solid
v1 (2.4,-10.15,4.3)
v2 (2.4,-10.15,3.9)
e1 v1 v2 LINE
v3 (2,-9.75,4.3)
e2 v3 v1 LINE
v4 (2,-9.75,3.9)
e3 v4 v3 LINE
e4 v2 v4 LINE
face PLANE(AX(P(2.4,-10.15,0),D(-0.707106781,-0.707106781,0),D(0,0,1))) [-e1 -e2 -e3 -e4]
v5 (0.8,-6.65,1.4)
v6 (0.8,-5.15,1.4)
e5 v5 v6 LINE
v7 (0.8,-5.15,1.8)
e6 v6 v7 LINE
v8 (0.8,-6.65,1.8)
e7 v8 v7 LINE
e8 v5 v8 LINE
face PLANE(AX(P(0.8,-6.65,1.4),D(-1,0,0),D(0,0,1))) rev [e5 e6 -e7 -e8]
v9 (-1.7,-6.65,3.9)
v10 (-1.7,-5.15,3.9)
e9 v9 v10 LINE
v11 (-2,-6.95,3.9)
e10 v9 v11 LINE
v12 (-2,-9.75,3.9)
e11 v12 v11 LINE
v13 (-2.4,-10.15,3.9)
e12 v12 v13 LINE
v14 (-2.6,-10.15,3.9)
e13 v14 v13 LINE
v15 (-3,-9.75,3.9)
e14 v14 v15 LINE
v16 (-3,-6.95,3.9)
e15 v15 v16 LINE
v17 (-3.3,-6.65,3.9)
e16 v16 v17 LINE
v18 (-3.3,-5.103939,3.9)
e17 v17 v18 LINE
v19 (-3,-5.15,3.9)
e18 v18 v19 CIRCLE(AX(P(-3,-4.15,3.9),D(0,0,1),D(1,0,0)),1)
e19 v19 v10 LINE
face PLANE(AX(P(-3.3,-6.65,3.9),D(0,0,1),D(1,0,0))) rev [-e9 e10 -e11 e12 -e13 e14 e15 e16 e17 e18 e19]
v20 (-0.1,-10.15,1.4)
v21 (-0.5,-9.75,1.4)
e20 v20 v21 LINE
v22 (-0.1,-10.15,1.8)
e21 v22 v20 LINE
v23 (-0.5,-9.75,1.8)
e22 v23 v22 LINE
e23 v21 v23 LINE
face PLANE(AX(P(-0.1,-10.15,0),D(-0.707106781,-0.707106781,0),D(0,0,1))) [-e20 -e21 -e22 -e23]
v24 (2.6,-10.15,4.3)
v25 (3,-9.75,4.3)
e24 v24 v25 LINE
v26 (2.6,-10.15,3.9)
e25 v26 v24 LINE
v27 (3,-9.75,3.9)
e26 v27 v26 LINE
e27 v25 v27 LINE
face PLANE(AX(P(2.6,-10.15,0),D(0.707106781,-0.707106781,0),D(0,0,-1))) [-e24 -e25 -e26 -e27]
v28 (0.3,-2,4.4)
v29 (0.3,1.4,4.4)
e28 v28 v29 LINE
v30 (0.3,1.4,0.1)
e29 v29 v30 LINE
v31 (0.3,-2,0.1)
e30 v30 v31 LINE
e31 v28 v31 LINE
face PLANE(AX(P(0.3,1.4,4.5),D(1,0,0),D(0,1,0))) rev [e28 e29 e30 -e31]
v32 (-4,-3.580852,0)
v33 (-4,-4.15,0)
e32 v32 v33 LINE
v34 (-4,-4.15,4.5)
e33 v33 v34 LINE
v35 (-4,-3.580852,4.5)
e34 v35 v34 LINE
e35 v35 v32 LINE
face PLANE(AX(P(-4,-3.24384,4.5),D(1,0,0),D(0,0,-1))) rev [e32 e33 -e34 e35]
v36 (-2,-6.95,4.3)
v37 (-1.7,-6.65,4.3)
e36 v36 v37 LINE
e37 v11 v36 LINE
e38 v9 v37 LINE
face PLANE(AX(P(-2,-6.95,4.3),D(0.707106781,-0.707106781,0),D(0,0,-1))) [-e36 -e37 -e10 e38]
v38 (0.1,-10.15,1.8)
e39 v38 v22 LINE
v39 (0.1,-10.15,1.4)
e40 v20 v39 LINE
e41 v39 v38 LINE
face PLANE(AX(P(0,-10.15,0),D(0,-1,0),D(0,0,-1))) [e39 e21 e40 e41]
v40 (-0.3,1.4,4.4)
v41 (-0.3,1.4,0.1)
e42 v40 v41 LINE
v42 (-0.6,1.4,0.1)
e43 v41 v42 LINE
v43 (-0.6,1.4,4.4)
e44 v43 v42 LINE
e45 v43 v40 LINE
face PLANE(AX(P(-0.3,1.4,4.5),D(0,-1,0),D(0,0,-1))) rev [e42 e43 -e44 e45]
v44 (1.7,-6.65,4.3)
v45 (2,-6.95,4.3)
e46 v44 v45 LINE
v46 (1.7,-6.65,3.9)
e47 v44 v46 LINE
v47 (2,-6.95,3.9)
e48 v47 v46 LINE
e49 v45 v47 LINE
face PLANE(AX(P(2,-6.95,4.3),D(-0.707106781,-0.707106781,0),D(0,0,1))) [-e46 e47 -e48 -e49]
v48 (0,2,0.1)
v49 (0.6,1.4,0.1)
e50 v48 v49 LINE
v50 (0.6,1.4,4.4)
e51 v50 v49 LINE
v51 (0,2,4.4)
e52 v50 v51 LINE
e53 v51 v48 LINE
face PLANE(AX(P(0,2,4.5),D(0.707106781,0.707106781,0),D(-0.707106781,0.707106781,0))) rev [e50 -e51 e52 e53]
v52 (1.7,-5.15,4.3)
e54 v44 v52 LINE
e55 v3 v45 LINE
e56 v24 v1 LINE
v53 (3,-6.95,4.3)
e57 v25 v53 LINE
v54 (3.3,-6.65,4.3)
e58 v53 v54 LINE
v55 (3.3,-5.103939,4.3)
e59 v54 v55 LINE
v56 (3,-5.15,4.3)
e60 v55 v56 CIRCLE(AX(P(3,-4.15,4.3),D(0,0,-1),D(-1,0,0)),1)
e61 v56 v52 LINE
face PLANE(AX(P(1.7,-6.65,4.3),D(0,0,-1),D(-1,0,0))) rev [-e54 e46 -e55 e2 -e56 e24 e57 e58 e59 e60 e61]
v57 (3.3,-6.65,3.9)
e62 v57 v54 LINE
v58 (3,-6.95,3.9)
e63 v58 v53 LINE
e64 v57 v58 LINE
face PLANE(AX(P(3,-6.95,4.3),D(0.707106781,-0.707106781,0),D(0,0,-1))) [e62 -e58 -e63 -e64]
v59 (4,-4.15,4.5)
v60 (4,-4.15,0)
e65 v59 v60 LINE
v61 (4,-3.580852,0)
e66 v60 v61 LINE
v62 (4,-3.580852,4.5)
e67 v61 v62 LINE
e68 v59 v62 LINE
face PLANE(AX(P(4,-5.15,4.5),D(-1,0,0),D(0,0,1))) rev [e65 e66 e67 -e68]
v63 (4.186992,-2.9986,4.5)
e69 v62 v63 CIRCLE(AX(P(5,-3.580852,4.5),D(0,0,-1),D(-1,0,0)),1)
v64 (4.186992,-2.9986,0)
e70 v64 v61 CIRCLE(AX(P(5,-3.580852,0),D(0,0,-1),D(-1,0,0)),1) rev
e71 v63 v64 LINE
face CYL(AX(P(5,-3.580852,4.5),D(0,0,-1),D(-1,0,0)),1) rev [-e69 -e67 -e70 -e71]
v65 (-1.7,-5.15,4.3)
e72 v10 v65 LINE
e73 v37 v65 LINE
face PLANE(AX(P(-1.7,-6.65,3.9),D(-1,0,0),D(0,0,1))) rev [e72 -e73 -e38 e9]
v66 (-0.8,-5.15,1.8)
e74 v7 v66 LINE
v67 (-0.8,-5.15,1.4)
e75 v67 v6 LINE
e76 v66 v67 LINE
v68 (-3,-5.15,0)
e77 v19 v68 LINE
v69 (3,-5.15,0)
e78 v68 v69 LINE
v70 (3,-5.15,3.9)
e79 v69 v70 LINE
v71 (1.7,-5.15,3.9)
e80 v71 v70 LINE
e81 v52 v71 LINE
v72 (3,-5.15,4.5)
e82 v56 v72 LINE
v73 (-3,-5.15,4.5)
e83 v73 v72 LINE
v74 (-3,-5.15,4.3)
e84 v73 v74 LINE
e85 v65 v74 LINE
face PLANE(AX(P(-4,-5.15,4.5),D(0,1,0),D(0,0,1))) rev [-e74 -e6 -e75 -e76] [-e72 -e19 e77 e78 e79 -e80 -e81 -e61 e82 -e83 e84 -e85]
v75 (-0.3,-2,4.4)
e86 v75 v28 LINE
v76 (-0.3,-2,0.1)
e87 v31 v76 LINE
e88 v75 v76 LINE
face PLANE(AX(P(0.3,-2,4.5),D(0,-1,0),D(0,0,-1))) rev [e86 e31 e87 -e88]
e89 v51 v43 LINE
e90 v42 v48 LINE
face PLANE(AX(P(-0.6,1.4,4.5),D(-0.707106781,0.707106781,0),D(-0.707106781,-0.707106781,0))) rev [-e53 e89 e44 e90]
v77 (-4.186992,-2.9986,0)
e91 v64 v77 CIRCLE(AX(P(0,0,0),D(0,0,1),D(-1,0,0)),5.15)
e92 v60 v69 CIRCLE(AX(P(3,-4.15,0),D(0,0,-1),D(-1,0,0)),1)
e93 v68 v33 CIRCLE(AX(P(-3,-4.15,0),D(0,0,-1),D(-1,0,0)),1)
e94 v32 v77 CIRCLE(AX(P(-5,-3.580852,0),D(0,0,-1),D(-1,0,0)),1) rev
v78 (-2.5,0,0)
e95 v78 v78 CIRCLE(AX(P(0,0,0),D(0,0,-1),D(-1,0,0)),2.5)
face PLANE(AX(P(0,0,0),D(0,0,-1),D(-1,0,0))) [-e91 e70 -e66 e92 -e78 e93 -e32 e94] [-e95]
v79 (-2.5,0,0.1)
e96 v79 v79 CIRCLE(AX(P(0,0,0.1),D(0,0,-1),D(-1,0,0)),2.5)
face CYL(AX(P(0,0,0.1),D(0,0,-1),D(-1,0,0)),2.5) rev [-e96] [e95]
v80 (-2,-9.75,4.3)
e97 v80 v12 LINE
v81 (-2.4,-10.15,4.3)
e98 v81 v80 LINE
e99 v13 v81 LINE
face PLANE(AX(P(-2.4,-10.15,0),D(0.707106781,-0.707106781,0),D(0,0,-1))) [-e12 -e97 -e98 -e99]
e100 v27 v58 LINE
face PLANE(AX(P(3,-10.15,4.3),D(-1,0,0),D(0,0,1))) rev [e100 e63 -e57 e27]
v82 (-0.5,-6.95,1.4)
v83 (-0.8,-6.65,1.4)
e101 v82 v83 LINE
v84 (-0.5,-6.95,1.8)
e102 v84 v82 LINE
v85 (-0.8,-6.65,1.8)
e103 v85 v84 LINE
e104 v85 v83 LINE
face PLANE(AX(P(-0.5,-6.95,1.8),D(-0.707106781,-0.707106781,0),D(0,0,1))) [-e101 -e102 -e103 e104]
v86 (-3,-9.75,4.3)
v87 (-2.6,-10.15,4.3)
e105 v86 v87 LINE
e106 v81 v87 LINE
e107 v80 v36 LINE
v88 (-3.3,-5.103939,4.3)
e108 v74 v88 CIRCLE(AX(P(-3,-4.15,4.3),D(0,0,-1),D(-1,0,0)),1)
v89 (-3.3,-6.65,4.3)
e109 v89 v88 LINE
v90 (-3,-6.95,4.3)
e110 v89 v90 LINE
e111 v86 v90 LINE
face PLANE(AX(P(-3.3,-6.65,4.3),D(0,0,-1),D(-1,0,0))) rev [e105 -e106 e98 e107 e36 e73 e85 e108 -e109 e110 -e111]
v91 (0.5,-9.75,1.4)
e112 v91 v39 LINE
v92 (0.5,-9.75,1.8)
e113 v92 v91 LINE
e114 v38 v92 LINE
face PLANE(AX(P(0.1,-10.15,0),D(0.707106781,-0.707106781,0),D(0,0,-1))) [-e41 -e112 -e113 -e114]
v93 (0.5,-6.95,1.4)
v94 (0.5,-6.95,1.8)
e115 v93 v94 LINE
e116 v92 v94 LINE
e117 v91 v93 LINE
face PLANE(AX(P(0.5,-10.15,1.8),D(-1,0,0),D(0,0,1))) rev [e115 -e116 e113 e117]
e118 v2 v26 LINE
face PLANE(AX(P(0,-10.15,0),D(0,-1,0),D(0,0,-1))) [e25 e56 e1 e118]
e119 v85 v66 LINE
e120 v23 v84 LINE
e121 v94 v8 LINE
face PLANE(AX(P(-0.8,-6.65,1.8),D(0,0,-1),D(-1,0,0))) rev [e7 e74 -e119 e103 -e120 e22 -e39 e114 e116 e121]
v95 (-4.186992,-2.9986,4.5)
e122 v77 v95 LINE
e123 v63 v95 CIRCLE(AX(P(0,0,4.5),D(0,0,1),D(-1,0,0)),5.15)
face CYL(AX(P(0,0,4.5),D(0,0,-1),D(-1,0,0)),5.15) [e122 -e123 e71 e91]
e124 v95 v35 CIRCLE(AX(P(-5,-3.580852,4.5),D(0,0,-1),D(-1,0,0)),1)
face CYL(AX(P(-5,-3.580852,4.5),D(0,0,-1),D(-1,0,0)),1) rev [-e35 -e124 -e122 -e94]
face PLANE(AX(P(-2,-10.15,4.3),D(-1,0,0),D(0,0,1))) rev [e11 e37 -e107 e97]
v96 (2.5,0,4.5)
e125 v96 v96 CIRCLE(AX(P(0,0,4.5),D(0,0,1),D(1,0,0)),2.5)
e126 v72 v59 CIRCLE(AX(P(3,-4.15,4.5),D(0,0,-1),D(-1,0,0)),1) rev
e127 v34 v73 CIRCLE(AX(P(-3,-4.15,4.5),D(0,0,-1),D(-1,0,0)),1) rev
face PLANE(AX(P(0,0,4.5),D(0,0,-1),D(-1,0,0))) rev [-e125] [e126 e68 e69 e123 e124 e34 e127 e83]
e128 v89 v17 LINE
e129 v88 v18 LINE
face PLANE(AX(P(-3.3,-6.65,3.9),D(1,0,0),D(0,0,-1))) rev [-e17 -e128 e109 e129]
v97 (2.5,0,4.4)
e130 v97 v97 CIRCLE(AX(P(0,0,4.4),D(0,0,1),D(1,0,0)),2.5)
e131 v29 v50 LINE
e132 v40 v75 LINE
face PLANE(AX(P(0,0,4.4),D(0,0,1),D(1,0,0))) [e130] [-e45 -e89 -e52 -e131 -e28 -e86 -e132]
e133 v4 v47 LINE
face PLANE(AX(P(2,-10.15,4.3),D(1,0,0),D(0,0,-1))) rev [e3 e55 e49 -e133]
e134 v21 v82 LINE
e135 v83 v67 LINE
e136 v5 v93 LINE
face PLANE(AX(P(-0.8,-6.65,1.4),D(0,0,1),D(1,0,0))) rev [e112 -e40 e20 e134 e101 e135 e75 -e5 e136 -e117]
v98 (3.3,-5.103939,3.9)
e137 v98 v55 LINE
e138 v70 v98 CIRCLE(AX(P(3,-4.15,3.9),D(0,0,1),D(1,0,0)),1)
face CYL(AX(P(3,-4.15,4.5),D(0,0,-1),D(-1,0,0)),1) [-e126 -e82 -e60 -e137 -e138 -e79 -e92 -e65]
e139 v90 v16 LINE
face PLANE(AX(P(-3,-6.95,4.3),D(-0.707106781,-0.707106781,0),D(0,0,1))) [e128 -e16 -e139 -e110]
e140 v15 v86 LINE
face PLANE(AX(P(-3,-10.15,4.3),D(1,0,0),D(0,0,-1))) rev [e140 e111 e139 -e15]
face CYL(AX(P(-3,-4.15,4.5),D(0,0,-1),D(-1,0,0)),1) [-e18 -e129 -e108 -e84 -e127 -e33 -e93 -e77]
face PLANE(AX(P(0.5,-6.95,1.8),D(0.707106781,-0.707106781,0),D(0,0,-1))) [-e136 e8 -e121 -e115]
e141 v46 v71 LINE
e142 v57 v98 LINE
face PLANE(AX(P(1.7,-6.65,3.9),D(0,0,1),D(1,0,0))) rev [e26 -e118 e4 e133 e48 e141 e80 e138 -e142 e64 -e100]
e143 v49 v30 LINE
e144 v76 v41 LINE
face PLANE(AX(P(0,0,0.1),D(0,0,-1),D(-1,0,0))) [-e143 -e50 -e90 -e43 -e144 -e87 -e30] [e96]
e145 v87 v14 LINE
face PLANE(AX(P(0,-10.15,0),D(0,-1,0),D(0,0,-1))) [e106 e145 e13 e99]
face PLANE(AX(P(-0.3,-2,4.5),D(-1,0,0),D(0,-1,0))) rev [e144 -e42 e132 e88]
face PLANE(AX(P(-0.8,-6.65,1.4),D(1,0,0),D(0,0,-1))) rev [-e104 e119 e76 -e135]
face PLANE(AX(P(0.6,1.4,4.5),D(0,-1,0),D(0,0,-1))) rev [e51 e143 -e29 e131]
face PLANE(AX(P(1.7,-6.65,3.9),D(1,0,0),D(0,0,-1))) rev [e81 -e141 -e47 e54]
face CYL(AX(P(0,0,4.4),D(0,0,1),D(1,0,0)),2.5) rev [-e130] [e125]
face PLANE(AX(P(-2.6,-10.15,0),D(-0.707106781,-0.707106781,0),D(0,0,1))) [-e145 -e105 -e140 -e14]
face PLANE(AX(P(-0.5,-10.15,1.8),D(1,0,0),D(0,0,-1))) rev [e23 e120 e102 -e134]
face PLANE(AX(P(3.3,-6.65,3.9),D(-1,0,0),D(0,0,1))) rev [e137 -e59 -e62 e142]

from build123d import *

# Parameters (mm, degrees)
BOSS_EXTRU_1_DEPTH      = 4.5
ESQUISSE2_W             = 1.6
ESQUISSE2_H             = 0.4
BOSS_EXTRU_2_DEPTH      = 1.5
ESQUISSE3_W             = 1
ESQUISSE3_H             = 0.4
BOSS_EXTRU_3_DEPTH      = 3.5
CHANFREIN1_SIZE         = 0.3
CHANFREIN2_SIZE         = 0.4
ESQUISSE4_R             = 2.5
ENL_V_MAT_EXTRU_1_DEPTH = 0.1
ENL_V_START             = -0.1
ESQUISSE5_R             = 2.5
ENL_V_MAT_EXTRU_2_DEPTH = 0.1
ENL_V_MAT_EXTRU_3_DEPTH = 13.202663644
CONG_1_R                = 1


# Some blends are built 0.0001 mm under size
with BuildPart() as part:
    # Esquisse1 → Boss.-Extru.1 (new body)
    with BuildSketch(Plane.XY):
        with BuildLine():
            Line((-4, -3.243840317), (-4, -5.15))
            Line((-4, -5.15), (4, -5.15))
            Line((4, -5.15), (4, -3.243840317))
            ThreePointArc((4, -3.243840317), (0, 5.15), (-4, -3.243840317))
        make_face()
    extrude(amount=BOSS_EXTRU_1_DEPTH)

    # Esquisse2 → Boss.-Extru.2 (add)
    with BuildSketch(Plane.XZ.offset(5.15)):
        with Locations((-2.5, 4.1)):
            Rectangle(ESQUISSE2_W, ESQUISSE2_H)
        with Locations((2.5, 4.1)):
            Rectangle(ESQUISSE2_W, ESQUISSE2_H)
        with Locations((0, 1.6)):
            Rectangle(ESQUISSE2_W, ESQUISSE2_H)
    extrude(amount=BOSS_EXTRU_2_DEPTH)

    # Esquisse3 → Boss.-Extru.3 (add)
    with BuildSketch(Plane.XZ.offset(6.65)):
        with Locations((-2.5, 4.1)):
            Rectangle(ESQUISSE3_W, ESQUISSE3_H)
        with Locations((2.5, 4.1)):
            Rectangle(ESQUISSE3_W, ESQUISSE3_H)
        with Locations((0, 1.6)):
            Rectangle(ESQUISSE3_W, ESQUISSE3_H)
    extrude(amount=BOSS_EXTRU_3_DEPTH)

    # Chanfrein1
    chanfrein1_edges = [part.edges().sort_by_distance(p)[0] for p in [
        (3, -6.65, 4.1),
        (-2, -6.65, 4.1),
        (0.5, -6.65, 1.6),
        (-0.5, -6.65, 1.6),
        (2, -6.65, 4.1),
        (-3, -6.65, 4.1),
    ]]
    chamfer(chanfrein1_edges, length=CHANFREIN1_SIZE - 0.0001)  # a hair under: the kernel refuses the full size

    # Chanfrein2
    chanfrein2_edges = [part.edges().sort_by_distance(p)[0] for p in [
        (-3, -10.15, 4.1),
        (-2, -10.15, 4.1),
        (2, -10.15, 4.1),
        (3, -10.15, 4.1),
        (-0.5, -10.15, 1.6),
        (0.5, -10.15, 1.6),
    ]]
    chamfer(chanfrein2_edges, length=CHANFREIN2_SIZE)

    # Esquisse4 → Enlèv. mat.-Extru.1 (cut)
    with BuildSketch(Plane(origin=(0, 0, 0), x_dir=(-1, 0, 0), z_dir=(0, 0, -1))):
        Circle(ESQUISSE4_R)
    extrude(amount=-ENL_V_MAT_EXTRU_1_DEPTH, mode=Mode.SUBTRACT)

    # Esquisse5 → Enlèv. mat.-Extru.2 (cut)
    with BuildSketch(Plane.XY.offset(4.5).offset(ENL_V_START)):
        with Locations(Location((0, 0, 0), (0, 0, 180))):
            Circle(ESQUISSE5_R)
    extrude(amount=ENL_V_MAT_EXTRU_2_DEPTH, mode=Mode.SUBTRACT)

    # Esquisse6 → Enlèv. mat.-Extru.3 (cut, through all)
    with BuildSketch(Plane(origin=(0, 0, 0.1), x_dir=(-1, 0, 0), z_dir=(0, 0, -1))):
        Polygon((0, 2), (-0.6, 1.4), (-0.3, 1.4), (-0.3, -2), (0.3, -2), (0.3, 1.4), (0.6, 1.4), align=None)
    extrude(amount=-ENL_V_MAT_EXTRU_3_DEPTH, mode=Mode.SUBTRACT)

    # Congé1
    # the kernel refuses this fillet: 1 mm, written as the material it adds along each edge
    with BuildSketch(Plane(origin=(-4, -3.243840317, 0), x_dir=(0, -1, 0), z_dir=(0, 0, 1))) as cong_1_piece_1:
        with BuildLine():
            CenterArc((0.337011537, -1), CONG_1_R, 90, 35.609116242)
            ThreePointArc((-0.245240797, -0.18699187), (-0.12122038, -0.095332066), (0, 0))
            Line((0, 0), (0.337011537, 0))
        make_face()
    extrude(amount=4.5)
    with BuildSketch(Plane(origin=(4, -3.243840317, 0), x_dir=(0, -1, 0), z_dir=(0, 0, 1))) as cong_1_piece_2:
        with BuildLine():
            CenterArc((0.337011537, 1), CONG_1_R, 234.390883758, 35.609116242)
            ThreePointArc((-0.245240797, 0.18699187), (-0.12122038, 0.095332066), (0, 0))
            Line((0, 0), (0.337011537, 0))
        make_face()
    extrude(amount=4.5)
    # the kernel refuses this fillet: 1 mm, written as the material it takes off along each edge
    with BuildSketch(Plane(origin=(-4, -5.15, -2.5), x_dir=(1, 0, 0), z_dir=(0, 0, 1))) as cong_1_2_piece_1_section:
        with BuildLine():
            CenterArc((CONG_1_R, CONG_1_R), CONG_1_R, 180, 90)
            Line((0, CONG_1_R), (0, 0))
            Line((0, 0), (CONG_1_R, 0))
        make_face()
    cong_1_2_piece_1 = extrude(amount=9.5, mode=Mode.PRIVATE)
    cong_1_2_piece_1 = split(cong_1_2_piece_1, bisect_by=Plane(origin=(-3.3, -5.149735602, 0.7), z_dir=(1, 0, 0)), keep=Keep.TOP, mode=Mode.PRIVATE)
    cong_1_2_piece_1 = split(cong_1_2_piece_1, bisect_by=Plane(origin=(-3.182548732, -5.149735602, 3.9), z_dir=(0, 0, -1)), keep=Keep.TOP, mode=Mode.PRIVATE)
    add(cong_1_2_piece_1, mode=Mode.SUBTRACT)
    with BuildSketch(Plane(origin=(-4, -5.15, -2.5), x_dir=(1, 0, 0), z_dir=(0, 0, 1))) as cong_1_2_piece_2_section:
        with BuildLine():
            CenterArc((CONG_1_R, CONG_1_R), CONG_1_R, 180, 90)
            Line((0, CONG_1_R), (0, 0))
            Line((0, 0), (CONG_1_R, 0))
        make_face()
    cong_1_2_piece_2 = extrude(amount=9.5, mode=Mode.PRIVATE)
    cong_1_2_piece_2 = split(cong_1_2_piece_2, bisect_by=Plane(origin=(-3.3, -4.913833239, 0.7), z_dir=(-1, 0, 0)), keep=Keep.TOP, mode=Mode.PRIVATE)
    cong_1_2_piece_2 = split(cong_1_2_piece_2, bisect_by=Plane(origin=(-3.799145829, -4.913833239, 3.9), z_dir=(0, 0, -1)), keep=Keep.TOP, mode=Mode.PRIVATE)
    add(cong_1_2_piece_2, mode=Mode.SUBTRACT)
    with BuildSketch(Plane(origin=(-4, -5.15, -2.5), x_dir=(1, 0, 0), z_dir=(0, 0, 1))) as cong_1_2_piece_3_section:
        with BuildLine():
            CenterArc((CONG_1_R, CONG_1_R), CONG_1_R, 180, 90)
            Line((0, CONG_1_R), (0, 0))
            Line((0, 0), (CONG_1_R, 0))
        make_face()
    cong_1_2_piece_3 = extrude(amount=9.5, mode=Mode.PRIVATE)
    cong_1_2_piece_3 = split(cong_1_2_piece_3, bisect_by=Plane(origin=(-3.799145829, -4.913833239, 4.3), z_dir=(0, 0, -1)), keep=Keep.TOP, mode=Mode.PRIVATE)
    cong_1_2_piece_3 = split(cong_1_2_piece_3, bisect_by=Plane(origin=(-3.3, -4.913833239, 4.1), z_dir=(-1, 0, 0)), keep=Keep.TOP, mode=Mode.PRIVATE)
    cong_1_2_piece_3 = split(cong_1_2_piece_3, bisect_by=Plane(origin=(-3.799145829, -4.913833239, 3.9), z_dir=(0, 0, 1)), keep=Keep.TOP, mode=Mode.PRIVATE)
    add(cong_1_2_piece_3, mode=Mode.SUBTRACT)
    with BuildSketch(Plane(origin=(-4, -5.15, -2.5), x_dir=(1, 0, 0), z_dir=(0, 0, 1))) as cong_1_2_piece_4_section:
        with BuildLine():
            CenterArc((CONG_1_R, CONG_1_R), CONG_1_R, 180, 90)
            Line((0, CONG_1_R), (0, 0))
            Line((0, 0), (CONG_1_R, 0))
        make_face()
    cong_1_2_piece_4 = extrude(amount=9.5, mode=Mode.PRIVATE)
    cong_1_2_piece_4 = split(cong_1_2_piece_4, bisect_by=Plane(origin=(-3.182548732, -5.149735602, 4.3), z_dir=(0, 0, 1)), keep=Keep.TOP, mode=Mode.PRIVATE)
    cong_1_2_piece_4 = split(cong_1_2_piece_4, bisect_by=Plane(origin=(-3.3, -5.149735602, 5.65), z_dir=(1, 0, 0)), keep=Keep.TOP, mode=Mode.PRIVATE)
    add(cong_1_2_piece_4, mode=Mode.SUBTRACT)
    with BuildSketch(Plane(origin=(-4, -5.15, -2.5), x_dir=(1, 0, 0), z_dir=(0, 0, 1))) as cong_1_2_piece_5_section:
        with BuildLine():
            CenterArc((CONG_1_R, CONG_1_R), CONG_1_R, 180, 90)
            Line((0, CONG_1_R), (0, 0))
            Line((0, 0), (CONG_1_R, 0))
        make_face()
    cong_1_2_piece_5 = extrude(amount=9.5, mode=Mode.PRIVATE)
    cong_1_2_piece_5 = split(cong_1_2_piece_5, bisect_by=Plane(origin=(-3.799145829, -4.913833239, 4.3), z_dir=(0, 0, 1)), keep=Keep.TOP, mode=Mode.PRIVATE)
    cong_1_2_piece_5 = split(cong_1_2_piece_5, bisect_by=Plane(origin=(-3.3, -4.913833239, 5.65), z_dir=(-1, 0, 0)), keep=Keep.TOP, mode=Mode.PRIVATE)
    add(cong_1_2_piece_5, mode=Mode.SUBTRACT)
    with BuildSketch(Plane(origin=(4, -5.15, -2.5), x_dir=(-1, 0, 0), z_dir=(0, 0, 1))) as cong_1_2_piece_6_section:
        with BuildLine():
            CenterArc((CONG_1_R, -CONG_1_R), CONG_1_R, 90, 90)
            Line((0, -CONG_1_R), (0, 0))
            Line((0, 0), (CONG_1_R, 0))
        make_face()
    cong_1_2_piece_6 = extrude(amount=9.5, mode=Mode.PRIVATE)
    cong_1_2_piece_6 = split(cong_1_2_piece_6, bisect_by=Plane(origin=(3.3, -5.149735602, 0.7), z_dir=(-1, 0, 0)), keep=Keep.TOP, mode=Mode.PRIVATE)
    cong_1_2_piece_6 = split(cong_1_2_piece_6, bisect_by=Plane(origin=(3.182548732, -5.149735602, 3.9), z_dir=(0, 0, -1)), keep=Keep.TOP, mode=Mode.PRIVATE)
    add(cong_1_2_piece_6, mode=Mode.SUBTRACT)
    with BuildSketch(Plane(origin=(4, -5.15, -2.5), x_dir=(-1, 0, 0), z_dir=(0, 0, 1))) as cong_1_2_piece_7_section:
        with BuildLine():
            CenterArc((CONG_1_R, -CONG_1_R), CONG_1_R, 90, 90)
            Line((0, -CONG_1_R), (0, 0))
            Line((0, 0), (CONG_1_R, 0))
        make_face()
    cong_1_2_piece_7 = extrude(amount=9.5, mode=Mode.PRIVATE)
    cong_1_2_piece_7 = split(cong_1_2_piece_7, bisect_by=Plane(origin=(3.3, -4.913833239, 0.7), z_dir=(1, 0, 0)), keep=Keep.TOP, mode=Mode.PRIVATE)
    cong_1_2_piece_7 = split(cong_1_2_piece_7, bisect_by=Plane(origin=(3.799145829, -4.913833239, 3.9), z_dir=(0, 0, -1)), keep=Keep.TOP, mode=Mode.PRIVATE)
    add(cong_1_2_piece_7, mode=Mode.SUBTRACT)
    with BuildSketch(Plane(origin=(4, -5.15, -2.5), x_dir=(-1, 0, 0), z_dir=(0, 0, 1))) as cong_1_2_piece_8_section:
        with BuildLine():
            CenterArc((CONG_1_R, -CONG_1_R), CONG_1_R, 90, 90)
            Line((0, -CONG_1_R), (0, 0))
            Line((0, 0), (CONG_1_R, 0))
        make_face()
    cong_1_2_piece_8 = extrude(amount=9.5, mode=Mode.PRIVATE)
    cong_1_2_piece_8 = split(cong_1_2_piece_8, bisect_by=Plane(origin=(3.799145829, -4.913833239, 4.3), z_dir=(0, 0, -1)), keep=Keep.TOP, mode=Mode.PRIVATE)
    cong_1_2_piece_8 = split(cong_1_2_piece_8, bisect_by=Plane(origin=(3.3, -4.913833239, 4.1), z_dir=(1, 0, 0)), keep=Keep.TOP, mode=Mode.PRIVATE)
    cong_1_2_piece_8 = split(cong_1_2_piece_8, bisect_by=Plane(origin=(3.799145829, -4.913833239, 3.9), z_dir=(0, 0, 1)), keep=Keep.TOP, mode=Mode.PRIVATE)
    add(cong_1_2_piece_8, mode=Mode.SUBTRACT)
    with BuildSketch(Plane(origin=(4, -5.15, -2.5), x_dir=(-1, 0, 0), z_dir=(0, 0, 1))) as cong_1_2_piece_9_section:
        with BuildLine():
            CenterArc((CONG_1_R, -CONG_1_R), CONG_1_R, 90, 90)
            Line((0, -CONG_1_R), (0, 0))
            Line((0, 0), (CONG_1_R, 0))
        make_face()
    cong_1_2_piece_9 = extrude(amount=9.5, mode=Mode.PRIVATE)
    cong_1_2_piece_9 = split(cong_1_2_piece_9, bisect_by=Plane(origin=(3.182548732, -5.149735602, 4.3), z_dir=(0, 0, 1)), keep=Keep.TOP, mode=Mode.PRIVATE)
    cong_1_2_piece_9 = split(cong_1_2_piece_9, bisect_by=Plane(origin=(3.3, -5.149735602, 5.65), z_dir=(-1, 0, 0)), keep=Keep.TOP, mode=Mode.PRIVATE)
    add(cong_1_2_piece_9, mode=Mode.SUBTRACT)
    with BuildSketch(Plane(origin=(4, -5.15, -2.5), x_dir=(-1, 0, 0), z_dir=(0, 0, 1))) as cong_1_2_piece_10_section:
        with BuildLine():
            CenterArc((CONG_1_R, -CONG_1_R), CONG_1_R, 90, 90)
            Line((0, -CONG_1_R), (0, 0))
            Line((0, 0), (CONG_1_R, 0))
        make_face()
    cong_1_2_piece_10 = extrude(amount=9.5, mode=Mode.PRIVATE)
    cong_1_2_piece_10 = split(cong_1_2_piece_10, bisect_by=Plane(origin=(3.799145829, -4.913833239, 4.3), z_dir=(0, 0, 1)), keep=Keep.TOP, mode=Mode.PRIVATE)
    cong_1_2_piece_10 = split(cong_1_2_piece_10, bisect_by=Plane(origin=(3.3, -4.913833239, 5.65), z_dir=(1, 0, 0)), keep=Keep.TOP, mode=Mode.PRIVATE)
    add(cong_1_2_piece_10, mode=Mode.SUBTRACT)


solid = part.part
